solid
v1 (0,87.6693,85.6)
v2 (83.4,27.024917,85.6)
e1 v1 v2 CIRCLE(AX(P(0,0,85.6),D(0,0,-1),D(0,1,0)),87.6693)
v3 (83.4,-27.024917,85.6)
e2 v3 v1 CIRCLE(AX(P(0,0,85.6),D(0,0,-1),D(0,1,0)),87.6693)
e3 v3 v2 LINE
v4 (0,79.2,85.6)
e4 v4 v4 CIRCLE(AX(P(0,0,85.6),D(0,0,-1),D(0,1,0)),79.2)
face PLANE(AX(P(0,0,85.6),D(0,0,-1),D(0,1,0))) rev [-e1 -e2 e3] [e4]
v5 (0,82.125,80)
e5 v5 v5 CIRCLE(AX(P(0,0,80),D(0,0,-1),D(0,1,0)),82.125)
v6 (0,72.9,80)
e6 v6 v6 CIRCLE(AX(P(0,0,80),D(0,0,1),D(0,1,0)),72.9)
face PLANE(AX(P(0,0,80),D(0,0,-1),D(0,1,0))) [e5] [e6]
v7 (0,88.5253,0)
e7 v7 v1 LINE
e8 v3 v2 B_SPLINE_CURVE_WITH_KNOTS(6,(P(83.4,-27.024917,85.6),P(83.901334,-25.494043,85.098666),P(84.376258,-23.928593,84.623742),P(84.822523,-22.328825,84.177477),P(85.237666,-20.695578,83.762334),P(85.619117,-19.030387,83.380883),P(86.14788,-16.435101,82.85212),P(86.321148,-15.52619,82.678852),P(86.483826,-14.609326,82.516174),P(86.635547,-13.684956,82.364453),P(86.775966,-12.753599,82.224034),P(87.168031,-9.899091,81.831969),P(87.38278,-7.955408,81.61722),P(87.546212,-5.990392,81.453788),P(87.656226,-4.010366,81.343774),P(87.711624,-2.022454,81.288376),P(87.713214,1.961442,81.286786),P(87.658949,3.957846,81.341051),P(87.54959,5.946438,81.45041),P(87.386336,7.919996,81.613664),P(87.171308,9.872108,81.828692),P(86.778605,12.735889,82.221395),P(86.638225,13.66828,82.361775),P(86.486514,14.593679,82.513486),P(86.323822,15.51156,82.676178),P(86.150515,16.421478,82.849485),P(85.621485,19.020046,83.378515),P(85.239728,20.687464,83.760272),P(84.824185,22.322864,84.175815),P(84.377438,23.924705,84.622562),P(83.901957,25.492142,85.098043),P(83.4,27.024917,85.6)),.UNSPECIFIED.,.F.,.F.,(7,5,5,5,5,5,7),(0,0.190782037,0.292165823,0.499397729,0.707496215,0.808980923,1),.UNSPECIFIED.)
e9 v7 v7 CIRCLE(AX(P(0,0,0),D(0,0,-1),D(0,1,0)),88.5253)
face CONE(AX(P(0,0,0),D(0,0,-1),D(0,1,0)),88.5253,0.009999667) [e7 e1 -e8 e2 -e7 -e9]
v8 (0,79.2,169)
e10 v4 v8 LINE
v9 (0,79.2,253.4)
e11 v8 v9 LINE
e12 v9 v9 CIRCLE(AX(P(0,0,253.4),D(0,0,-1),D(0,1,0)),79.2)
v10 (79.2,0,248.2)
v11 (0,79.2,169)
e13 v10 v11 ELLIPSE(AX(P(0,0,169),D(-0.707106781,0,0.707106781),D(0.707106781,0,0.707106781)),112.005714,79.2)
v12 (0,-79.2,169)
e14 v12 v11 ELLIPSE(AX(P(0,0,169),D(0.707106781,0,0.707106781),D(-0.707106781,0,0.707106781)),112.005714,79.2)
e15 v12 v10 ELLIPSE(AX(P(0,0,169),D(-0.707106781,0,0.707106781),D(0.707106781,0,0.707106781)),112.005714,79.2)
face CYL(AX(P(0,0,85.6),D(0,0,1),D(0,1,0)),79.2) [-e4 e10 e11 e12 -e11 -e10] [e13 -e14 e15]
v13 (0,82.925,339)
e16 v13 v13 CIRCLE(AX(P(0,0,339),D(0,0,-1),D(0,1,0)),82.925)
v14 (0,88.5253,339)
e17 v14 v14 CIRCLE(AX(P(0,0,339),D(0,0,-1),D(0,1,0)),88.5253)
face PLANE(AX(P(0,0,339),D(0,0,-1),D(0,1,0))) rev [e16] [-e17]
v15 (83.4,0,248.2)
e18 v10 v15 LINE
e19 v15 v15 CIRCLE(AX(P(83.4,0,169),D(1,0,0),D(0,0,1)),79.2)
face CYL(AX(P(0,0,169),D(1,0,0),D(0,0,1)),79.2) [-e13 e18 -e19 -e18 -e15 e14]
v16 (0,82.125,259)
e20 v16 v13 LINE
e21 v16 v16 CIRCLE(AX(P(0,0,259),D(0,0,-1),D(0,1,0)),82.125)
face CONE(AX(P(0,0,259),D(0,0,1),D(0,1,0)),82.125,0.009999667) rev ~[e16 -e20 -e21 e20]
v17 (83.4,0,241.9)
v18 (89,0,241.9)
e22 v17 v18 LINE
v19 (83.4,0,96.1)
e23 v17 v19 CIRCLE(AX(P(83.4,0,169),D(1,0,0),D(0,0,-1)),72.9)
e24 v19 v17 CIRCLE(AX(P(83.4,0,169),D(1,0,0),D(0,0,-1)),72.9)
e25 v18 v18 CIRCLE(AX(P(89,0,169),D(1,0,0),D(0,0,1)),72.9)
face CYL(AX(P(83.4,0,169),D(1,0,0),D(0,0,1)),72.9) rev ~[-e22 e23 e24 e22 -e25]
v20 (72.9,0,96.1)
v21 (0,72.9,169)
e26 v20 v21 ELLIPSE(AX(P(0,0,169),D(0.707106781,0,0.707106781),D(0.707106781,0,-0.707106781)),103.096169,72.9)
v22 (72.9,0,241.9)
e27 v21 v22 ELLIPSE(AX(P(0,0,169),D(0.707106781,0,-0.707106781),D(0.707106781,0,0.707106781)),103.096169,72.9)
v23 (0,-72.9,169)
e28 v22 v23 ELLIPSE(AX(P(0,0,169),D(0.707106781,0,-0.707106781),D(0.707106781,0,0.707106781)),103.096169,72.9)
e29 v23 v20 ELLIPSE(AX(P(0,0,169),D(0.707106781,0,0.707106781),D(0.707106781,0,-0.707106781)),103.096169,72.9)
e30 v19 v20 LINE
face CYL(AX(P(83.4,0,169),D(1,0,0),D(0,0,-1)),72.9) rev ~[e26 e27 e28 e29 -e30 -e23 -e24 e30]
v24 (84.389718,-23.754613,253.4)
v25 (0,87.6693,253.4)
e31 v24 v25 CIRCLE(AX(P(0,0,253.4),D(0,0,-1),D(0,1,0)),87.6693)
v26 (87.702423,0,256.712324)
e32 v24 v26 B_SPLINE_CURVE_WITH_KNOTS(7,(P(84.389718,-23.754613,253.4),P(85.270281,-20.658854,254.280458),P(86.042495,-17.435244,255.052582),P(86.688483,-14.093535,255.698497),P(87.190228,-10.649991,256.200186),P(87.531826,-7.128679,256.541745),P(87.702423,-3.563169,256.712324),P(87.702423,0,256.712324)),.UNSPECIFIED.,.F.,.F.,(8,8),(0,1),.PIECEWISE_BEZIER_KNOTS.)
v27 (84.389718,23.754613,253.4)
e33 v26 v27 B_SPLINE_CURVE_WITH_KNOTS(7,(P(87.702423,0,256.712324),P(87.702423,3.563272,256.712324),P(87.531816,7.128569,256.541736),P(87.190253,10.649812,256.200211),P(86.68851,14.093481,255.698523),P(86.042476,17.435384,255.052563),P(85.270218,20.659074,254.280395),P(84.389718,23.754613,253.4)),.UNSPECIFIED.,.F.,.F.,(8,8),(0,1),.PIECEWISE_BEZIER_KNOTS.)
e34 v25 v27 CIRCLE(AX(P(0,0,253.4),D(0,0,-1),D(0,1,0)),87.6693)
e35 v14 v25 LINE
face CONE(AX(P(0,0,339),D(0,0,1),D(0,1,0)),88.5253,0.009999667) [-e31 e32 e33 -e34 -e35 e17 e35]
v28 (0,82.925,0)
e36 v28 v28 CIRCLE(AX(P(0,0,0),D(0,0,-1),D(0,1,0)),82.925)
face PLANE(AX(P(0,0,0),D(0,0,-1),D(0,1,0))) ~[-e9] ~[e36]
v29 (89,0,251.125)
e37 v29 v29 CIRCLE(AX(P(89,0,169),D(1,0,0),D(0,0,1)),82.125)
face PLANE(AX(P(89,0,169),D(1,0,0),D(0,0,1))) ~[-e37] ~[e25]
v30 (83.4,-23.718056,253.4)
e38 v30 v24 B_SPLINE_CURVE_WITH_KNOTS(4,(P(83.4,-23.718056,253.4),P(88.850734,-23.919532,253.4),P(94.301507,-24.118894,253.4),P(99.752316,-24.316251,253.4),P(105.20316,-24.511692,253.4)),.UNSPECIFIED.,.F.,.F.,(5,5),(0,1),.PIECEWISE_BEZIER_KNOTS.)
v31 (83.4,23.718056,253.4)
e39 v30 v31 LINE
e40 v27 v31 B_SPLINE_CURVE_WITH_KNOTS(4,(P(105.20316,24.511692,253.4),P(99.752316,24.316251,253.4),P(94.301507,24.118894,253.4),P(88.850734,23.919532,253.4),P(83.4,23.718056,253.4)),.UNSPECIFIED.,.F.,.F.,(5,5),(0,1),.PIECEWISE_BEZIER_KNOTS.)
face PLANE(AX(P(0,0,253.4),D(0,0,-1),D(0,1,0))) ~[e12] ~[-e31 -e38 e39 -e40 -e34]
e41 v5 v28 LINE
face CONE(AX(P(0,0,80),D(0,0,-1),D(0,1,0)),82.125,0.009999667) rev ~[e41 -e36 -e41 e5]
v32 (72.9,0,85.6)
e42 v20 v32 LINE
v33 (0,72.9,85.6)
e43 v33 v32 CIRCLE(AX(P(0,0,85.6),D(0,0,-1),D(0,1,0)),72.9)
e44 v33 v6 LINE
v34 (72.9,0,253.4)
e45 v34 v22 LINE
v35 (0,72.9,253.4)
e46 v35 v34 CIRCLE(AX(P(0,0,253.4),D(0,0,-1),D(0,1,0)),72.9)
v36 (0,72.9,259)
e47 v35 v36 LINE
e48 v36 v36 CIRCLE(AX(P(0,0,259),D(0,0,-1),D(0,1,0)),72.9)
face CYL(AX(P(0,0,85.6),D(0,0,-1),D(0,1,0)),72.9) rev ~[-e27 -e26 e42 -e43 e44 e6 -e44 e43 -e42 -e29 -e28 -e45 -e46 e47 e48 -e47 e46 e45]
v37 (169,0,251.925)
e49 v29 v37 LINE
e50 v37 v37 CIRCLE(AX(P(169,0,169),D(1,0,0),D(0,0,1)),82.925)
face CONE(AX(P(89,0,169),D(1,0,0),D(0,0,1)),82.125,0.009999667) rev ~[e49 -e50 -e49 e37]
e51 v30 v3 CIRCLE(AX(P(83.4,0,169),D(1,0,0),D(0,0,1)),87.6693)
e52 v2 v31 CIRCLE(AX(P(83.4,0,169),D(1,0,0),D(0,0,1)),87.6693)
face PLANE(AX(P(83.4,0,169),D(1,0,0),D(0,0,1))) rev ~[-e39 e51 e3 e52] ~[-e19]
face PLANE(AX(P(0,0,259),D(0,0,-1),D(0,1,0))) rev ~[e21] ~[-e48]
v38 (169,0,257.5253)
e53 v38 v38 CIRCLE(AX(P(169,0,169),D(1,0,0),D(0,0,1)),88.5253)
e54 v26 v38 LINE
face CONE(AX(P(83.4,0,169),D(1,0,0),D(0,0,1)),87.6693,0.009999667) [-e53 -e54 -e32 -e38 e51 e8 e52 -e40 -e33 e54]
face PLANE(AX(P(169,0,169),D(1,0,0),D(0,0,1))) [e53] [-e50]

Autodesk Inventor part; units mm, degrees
ref_plane "YZ Plane" through (0, 0, 0) normal (1, 0, 0) x (0, 1, 0)
ref_plane "XZ Plane" through (0, 0, 0) normal (0, 1, 0) x (-1, 0, 0)
ref_plane "XY Plane" through (0, 0, 0) normal (0, 0, 1) x (1, 0, 0)
sketch "Sketch1" plane through (0, 0, 0) normal (1, 0, 0) x (0, 1, 0)
  line L0 (0, 0) -> (88.5253, 0)
  line L1 (88.5253, 0) -> (87.6693, 85.6)
  line L2 (82.125, 80) -> (72.9, 80)
  line L3 (0, 85.6) -> (0, 0)
  line L4 (82.125, 80) -> (82.925, 0)
  line L5 (0, 85.6) -> (87.6693, 85.6)
  line L6 (72.9, 85.6) -> (72.9, 80)
  line L7 (72.9, 253.4) -> (72.9, 85.6)
  line L8 (79.2, 85.6) -> (79.2, 253.4)
  line L9 (0, 253.4) -> (0, 85.6)
  line L10 (0, 169.5) -> (79.2, 169.5) construction
  line L11 (0, 339) -> (88.5253, 339)
  line L12 (88.5253, 339) -> (87.6693, 253.4)
  line L13 (82.125, 259) -> (72.9, 259)
  line L14 (0, 253.4) -> (0, 339)
  line L15 (82.125, 259) -> (82.925, 339)
  line L16 (0, 253.4) -> (87.6693, 253.4)
  line L17 (72.9, 253.4) -> (72.9, 259)
  dimension "d0" = 165.85
  dimension "d3" = 164.25
  dimension "d4" = 145.8
  dimension "d5" = 80
  dimension "d6" = 5.6
  dimension "d7" = 5.6
  dimension "d8" = 158.4
  dimension "d20" = 339
revolve "Revolution1" add sketch "Sketch1" angle 360 about axis through (0, 0, 85.6) along (0, 0, -1) contours L4 L2 L6 L5 L1 L0 | L9 L16 L7 L5 | L7 L16 L8 L5 | L17 L13 L15 L11 L12 L16
sketch "Sketch2" plane through (0, 0, 0) normal (0, 1, 0) x (-1, 0, 0)
  line L0 (-82.925, 0) -> (82.925, 0) projected
  line L1 (0, 0) -> (0, 339)
  line L2 (0, 169) -> (-169, 169)
  line L3 (-89, 241.9) -> (-89, 251.125)
  line L4 (-83.4, 256.6693) -> (-169, 257.5253)
  line L5 (-169, 257.5253) -> (-169, 169)
  line L6 (-89, 251.125) -> (-169, 251.925)
  line L7 (-83.4, 256.6693) -> (-83.4, 169)
  line L8 (-83.4, 241.9) -> (-89, 241.9)
  line L9 (0, 248.2) -> (-83.4, 248.2)
  line L10 (-82.925, 339) -> (82.925, 339) projected
  dimension "d9" = 165.85
  dimension "d10" = 164.25
  dimension "d11" = 145.8
  dimension "d12" = 5.6
  dimension "d13" = 80
  dimension "d14" = 5.6
  dimension "d15" = 158.4
  dimension "d16" = 169
  dimension "d17" = 169
revolve "Revolution2" add sketch "Sketch2" angle 360 about axis through (0, 0, 169) along (1, 0, 0) contours L2 L7 L9 L1 | L7 L8 L3 L6 L5 L4
sketch "Sketch3" plane through (0, 0, 253.4) normal (0, 0, 1) x (1, 0, 0)
  circle A0 centre (0, 0) radius 72.9 projected
  circle A1 centre (0, 0) radius 72.9
extrude "Extrusion1" cut sketch "Sketch3" against normal through all
sketch "Sketch4" plane through (83.4, 0, 169) normal (1, 0, 0) x (0, 0, -1)
  circle A0 centre (0, 0) radius 72.9 projected
  circle A1 centre (0, 0) radius 72.9
  circle A2 centre (0, 0) radius 72.9 projected
extrude "Extrusion2" cut sketch "Sketch4" against normal up to surface
equation "\"d9\" = d1"
equation "\"d10\" = d2"
equation "\"d11\" = d"
equation "\"d12\" = t2"
equation "\"d13\" = l1"
equation "\"d14\" = t2"
equation "\"d15\" = d + 2 * t1"
equation "\"d16\" = L3"
equation "\"d17\" = L1"
equation "\"d0\" = d1"
equation "\"d3\" = d2"
equation "\"d4\" = d"
equation "\"d5\" = l1"
equation "\"d6\" = t2"
equation "\"d7\" = t2"
equation "\"d8\" = d + 2 * t1"
equation "\"d20\" = L1 + L2"
equation "\"d\" = 145.8"
equation "\"d1\" = 165.85"
equation "\"d2\" = 164.25"
equation "\"l1\" = 80"
equation "\"L1\" = 169"
equation "\"L2\" = 170"
equation "\"L3\" = 169"
equation "\"t1\" = 6.3"
equation "\"t2\" = 5.6"
equation "\"Z1\" = 89"
equation "\"Z3\" = 89"
properties part number "JIS K 6739 90 Deg Lateral (DT) 150" material "PVC, Unplasticized"
